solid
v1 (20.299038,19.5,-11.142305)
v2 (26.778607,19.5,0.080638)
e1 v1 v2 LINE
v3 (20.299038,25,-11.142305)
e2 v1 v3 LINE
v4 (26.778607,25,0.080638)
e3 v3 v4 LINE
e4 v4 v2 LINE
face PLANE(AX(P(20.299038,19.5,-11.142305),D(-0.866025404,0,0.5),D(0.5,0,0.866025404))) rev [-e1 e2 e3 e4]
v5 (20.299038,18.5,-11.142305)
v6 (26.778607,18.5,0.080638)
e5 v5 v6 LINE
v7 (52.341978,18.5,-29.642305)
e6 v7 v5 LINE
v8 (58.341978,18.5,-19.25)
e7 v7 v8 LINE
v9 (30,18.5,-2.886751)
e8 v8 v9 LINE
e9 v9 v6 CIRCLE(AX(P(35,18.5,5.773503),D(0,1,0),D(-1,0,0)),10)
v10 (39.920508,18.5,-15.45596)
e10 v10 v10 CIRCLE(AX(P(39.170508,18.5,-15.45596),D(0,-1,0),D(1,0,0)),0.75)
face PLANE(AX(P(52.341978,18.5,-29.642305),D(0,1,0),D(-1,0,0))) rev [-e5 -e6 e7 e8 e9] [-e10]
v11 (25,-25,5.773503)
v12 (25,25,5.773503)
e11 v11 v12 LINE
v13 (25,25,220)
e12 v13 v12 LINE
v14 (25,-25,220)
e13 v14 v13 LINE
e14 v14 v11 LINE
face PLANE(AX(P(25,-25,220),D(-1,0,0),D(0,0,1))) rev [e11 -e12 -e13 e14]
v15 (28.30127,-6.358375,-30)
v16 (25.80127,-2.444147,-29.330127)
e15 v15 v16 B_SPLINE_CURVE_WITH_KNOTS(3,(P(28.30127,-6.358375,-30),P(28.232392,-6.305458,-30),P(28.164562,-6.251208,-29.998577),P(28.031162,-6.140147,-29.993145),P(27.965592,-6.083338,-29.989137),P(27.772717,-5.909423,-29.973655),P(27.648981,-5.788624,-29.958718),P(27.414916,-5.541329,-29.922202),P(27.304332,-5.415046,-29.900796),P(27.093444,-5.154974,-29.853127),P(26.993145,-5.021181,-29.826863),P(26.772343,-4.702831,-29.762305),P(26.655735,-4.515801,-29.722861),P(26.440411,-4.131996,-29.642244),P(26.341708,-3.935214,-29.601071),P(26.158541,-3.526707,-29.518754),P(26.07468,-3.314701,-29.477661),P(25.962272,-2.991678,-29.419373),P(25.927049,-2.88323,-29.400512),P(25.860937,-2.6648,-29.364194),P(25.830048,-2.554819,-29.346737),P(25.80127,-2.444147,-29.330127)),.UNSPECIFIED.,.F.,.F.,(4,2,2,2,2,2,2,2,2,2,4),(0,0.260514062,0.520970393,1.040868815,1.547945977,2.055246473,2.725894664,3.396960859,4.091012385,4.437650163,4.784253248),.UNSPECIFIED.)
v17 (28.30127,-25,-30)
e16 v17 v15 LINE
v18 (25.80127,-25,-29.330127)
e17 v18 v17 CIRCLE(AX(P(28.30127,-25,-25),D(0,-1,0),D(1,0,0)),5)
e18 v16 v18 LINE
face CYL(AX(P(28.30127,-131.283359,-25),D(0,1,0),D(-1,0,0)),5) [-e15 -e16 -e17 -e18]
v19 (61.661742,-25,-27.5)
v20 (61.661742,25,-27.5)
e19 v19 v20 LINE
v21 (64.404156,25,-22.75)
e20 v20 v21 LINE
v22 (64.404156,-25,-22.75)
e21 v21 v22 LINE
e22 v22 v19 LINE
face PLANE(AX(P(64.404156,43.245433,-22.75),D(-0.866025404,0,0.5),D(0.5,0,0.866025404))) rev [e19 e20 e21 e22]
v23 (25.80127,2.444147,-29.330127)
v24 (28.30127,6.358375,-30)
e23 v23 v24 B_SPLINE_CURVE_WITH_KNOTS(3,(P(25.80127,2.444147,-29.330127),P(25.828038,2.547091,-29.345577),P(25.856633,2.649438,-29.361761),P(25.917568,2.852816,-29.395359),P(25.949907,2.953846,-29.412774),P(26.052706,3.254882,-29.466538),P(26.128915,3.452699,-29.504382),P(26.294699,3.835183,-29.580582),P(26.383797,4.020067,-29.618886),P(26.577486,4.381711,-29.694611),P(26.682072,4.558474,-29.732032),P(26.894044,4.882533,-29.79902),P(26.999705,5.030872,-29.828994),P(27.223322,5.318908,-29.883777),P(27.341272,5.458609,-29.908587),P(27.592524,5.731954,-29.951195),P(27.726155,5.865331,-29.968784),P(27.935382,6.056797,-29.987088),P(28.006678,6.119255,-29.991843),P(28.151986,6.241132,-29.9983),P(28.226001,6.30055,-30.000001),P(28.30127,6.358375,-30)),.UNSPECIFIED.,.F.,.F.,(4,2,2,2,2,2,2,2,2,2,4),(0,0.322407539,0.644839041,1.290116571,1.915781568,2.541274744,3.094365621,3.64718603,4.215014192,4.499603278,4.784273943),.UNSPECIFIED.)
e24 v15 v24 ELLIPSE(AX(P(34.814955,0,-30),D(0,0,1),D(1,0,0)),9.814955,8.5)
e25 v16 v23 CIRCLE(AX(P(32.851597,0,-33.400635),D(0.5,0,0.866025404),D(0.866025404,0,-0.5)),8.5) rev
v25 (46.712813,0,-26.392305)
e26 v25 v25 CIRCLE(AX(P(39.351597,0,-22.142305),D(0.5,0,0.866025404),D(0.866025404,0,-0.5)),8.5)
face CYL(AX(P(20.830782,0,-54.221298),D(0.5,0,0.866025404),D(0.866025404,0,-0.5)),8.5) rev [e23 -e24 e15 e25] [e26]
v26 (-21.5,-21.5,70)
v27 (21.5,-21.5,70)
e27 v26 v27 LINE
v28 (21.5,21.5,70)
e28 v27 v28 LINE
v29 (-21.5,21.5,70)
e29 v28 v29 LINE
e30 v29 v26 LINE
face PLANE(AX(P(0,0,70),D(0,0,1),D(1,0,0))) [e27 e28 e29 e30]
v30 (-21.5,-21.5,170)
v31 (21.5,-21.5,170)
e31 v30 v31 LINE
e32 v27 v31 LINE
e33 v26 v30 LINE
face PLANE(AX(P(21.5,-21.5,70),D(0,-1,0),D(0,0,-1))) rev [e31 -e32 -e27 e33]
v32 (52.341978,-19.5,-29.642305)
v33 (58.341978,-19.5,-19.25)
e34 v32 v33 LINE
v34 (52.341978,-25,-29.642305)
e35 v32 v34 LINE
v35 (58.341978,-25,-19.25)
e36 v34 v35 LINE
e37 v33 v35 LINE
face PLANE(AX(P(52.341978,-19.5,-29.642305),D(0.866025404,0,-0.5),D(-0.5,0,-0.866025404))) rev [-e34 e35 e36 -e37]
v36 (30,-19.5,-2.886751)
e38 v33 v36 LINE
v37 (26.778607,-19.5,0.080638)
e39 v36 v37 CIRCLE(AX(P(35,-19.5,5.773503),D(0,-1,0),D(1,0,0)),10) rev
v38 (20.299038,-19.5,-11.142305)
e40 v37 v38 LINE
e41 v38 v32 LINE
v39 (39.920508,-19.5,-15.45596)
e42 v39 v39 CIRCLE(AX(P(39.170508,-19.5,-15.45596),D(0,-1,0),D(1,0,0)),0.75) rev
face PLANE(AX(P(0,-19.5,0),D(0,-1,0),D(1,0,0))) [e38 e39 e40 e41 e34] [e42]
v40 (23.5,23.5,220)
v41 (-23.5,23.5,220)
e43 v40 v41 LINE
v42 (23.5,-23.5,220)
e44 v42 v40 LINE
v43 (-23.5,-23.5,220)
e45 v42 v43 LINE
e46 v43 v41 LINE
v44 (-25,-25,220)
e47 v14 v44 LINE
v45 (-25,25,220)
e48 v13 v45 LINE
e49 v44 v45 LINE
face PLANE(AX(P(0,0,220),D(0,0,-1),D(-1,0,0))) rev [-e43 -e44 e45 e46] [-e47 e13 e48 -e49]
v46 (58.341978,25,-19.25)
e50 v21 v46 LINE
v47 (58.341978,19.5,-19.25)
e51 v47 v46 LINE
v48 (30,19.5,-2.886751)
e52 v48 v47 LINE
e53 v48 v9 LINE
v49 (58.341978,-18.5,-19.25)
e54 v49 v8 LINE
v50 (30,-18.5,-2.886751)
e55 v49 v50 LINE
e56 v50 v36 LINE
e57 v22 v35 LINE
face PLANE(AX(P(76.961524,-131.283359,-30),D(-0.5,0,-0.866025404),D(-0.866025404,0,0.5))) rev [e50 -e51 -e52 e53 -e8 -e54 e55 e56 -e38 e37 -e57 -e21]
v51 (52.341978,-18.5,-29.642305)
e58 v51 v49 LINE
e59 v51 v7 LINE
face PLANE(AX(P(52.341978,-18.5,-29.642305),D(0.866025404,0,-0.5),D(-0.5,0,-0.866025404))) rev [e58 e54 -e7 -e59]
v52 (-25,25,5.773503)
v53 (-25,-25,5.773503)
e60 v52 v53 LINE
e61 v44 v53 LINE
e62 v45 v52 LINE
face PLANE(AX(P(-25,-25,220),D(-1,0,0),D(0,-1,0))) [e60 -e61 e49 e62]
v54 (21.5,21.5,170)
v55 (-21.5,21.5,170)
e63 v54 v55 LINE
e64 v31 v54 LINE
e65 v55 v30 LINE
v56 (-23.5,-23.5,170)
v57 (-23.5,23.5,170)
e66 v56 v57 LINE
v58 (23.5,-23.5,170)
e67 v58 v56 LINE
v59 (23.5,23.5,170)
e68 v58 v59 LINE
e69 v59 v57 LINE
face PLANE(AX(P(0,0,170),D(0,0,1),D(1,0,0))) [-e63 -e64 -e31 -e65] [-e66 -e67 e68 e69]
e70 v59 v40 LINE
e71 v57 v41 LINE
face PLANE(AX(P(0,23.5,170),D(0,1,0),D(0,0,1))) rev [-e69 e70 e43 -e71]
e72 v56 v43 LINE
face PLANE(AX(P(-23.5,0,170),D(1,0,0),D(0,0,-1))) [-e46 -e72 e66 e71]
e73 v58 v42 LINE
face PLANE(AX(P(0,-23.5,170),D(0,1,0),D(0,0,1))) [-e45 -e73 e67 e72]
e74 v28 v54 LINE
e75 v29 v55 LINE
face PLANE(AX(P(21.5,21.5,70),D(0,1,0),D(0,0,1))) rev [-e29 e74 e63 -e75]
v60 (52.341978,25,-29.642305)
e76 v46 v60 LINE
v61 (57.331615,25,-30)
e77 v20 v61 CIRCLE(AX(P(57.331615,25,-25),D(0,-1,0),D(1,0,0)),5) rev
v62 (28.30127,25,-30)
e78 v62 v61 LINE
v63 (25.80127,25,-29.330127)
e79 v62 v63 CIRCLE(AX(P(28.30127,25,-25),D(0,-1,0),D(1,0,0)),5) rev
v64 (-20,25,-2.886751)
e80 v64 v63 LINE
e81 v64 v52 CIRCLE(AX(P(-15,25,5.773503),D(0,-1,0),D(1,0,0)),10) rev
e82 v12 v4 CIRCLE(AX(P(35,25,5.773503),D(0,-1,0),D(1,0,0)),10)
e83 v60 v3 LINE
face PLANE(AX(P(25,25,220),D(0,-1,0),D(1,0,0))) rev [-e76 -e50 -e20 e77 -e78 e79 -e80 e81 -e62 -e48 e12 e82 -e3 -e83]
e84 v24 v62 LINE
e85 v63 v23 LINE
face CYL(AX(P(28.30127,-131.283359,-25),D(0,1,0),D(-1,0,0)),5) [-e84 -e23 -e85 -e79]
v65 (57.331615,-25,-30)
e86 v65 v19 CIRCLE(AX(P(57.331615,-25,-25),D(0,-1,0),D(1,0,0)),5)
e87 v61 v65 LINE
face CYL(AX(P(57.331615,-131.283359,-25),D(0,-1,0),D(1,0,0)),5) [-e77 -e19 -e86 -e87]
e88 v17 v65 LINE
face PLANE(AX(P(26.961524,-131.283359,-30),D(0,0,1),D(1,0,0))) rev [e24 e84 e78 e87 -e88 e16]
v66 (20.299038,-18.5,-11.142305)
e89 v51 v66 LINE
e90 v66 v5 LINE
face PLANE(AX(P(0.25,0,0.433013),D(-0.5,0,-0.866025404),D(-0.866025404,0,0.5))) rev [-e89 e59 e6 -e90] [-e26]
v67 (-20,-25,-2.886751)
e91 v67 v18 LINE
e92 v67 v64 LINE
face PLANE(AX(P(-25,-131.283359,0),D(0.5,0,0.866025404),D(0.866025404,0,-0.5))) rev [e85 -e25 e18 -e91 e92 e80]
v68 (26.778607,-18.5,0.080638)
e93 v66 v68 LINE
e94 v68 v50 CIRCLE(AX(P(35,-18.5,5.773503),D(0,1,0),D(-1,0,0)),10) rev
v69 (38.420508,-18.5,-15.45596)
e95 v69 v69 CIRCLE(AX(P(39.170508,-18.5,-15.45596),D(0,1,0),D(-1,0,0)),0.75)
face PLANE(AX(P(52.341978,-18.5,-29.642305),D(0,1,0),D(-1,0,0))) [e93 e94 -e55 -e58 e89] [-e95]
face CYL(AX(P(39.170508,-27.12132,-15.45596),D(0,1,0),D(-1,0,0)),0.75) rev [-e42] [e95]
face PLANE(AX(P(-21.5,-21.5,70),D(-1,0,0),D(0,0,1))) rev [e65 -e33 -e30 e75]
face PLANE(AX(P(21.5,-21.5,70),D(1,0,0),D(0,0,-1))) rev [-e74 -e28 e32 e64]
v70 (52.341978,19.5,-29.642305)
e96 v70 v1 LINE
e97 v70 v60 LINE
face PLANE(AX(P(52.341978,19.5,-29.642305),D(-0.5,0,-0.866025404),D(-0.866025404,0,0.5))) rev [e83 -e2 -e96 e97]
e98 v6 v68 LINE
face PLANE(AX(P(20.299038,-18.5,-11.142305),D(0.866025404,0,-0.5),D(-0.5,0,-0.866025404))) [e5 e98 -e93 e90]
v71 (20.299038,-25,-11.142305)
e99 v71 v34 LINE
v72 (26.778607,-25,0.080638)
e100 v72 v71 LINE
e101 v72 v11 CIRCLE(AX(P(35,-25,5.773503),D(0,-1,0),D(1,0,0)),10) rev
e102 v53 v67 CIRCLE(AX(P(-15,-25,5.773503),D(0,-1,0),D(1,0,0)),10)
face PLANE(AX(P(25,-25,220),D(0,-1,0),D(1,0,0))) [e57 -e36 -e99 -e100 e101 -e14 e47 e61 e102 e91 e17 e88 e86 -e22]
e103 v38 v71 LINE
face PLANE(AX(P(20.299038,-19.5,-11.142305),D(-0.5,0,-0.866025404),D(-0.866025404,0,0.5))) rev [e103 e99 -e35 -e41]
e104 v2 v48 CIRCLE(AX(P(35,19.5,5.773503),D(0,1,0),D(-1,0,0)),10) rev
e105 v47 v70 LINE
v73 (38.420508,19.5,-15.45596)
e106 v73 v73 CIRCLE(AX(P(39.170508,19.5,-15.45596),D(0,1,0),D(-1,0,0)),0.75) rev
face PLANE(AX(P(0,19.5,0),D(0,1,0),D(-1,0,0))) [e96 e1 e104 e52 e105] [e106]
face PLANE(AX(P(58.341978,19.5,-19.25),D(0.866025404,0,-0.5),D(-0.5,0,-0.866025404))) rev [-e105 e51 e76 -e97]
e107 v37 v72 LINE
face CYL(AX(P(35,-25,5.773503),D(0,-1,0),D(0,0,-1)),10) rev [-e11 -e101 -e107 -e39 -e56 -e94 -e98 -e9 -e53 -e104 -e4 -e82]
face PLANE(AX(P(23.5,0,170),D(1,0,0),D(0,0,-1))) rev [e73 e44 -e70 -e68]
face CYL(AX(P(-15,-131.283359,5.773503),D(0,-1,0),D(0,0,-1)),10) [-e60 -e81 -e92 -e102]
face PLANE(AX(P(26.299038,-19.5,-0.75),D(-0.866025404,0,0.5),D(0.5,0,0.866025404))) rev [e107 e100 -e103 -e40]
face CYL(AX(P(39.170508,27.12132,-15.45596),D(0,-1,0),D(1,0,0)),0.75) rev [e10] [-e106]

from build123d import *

# Parameters (mm, degrees)
SKETCH_1_W           = 50
SKETCH_1_H           = 50
EXTRUDE_1_DEPTH      = 220
EXTRUDE_2_DEPTH      = 50
SKETCH_4_W           = 37
SKETCH_4_H           = 37
CUT_EXTRUDE_2_DEPTH  = 12
CUT_EXTRUDE_3_REACH  = 235.922
SKETCH_5_R           = 8.5
SKETCH_8_R           = 0.75
CUT_EXTRUDE_4_DEPTH  = 6.5
CUT_EXTRUDE_START    = -6.5
SKETCH_7_R           = 0.75
CUT_EXTRUDE_5_DEPTH  = 6.5
CUT_EXTRUDE_6_DEPTH  = 5.5
CUT_EXTRUDE_7_DEPTH  = 5.5
CUT_EXTRUDE_8_DEPTH  = 50
FILLET_1_R           = 5
FILLET_2_R           = 5
FILLET_3_R           = 10
FILLET_4_R           = 10
SKETCH_13_W          = 47
SKETCH_13_H          = 47
CUT_EXTRUDE_9_DEPTH  = 50
SKETCH_2_W           = 43
SKETCH_2_H           = 43
CUT_EXTRUDE_10_DEPTH = 150
FILLET_5_R           = 5


with BuildPart() as part:
    # 草图1 → 凸台-拉伸1 (new body)
    with BuildSketch(Plane.XY):
        Rectangle(SKETCH_1_W, SKETCH_1_H)
    extrude(amount=EXTRUDE_1_DEPTH)

    # 草图3 → 凸台-拉伸2 (add)
    with BuildSketch(Plane(origin=(0, 25, 0), x_dir=(1, 0, 0), z_dir=(0, 1, 0))):
        Polygon((25, 0), (-25, 0), (26.961524227, 30), (76.961524227, 30), align=None)
    extrude(amount=-EXTRUDE_2_DEPTH)

    # 草图4 → 切除-拉伸2 (cut)
    with BuildSketch(Plane(origin=(6.25, 0, 10.825317547), x_dir=(0.8660254037844415, 0, -0.4999999999999951), z_dir=(0.4999999999999951, 0, 0.8660254037844415))):
        with Locations((41.650635095, 0)):
            Rectangle(SKETCH_4_W, SKETCH_4_H)
    extrude(amount=-CUT_EXTRUDE_2_DEPTH, mode=Mode.SUBTRACT)

    # 切除-拉伸3: up to this face of the body (flat: up to its plane)
    cut_extrude_3_end = Plane(part.part.faces().sort_by_distance((0.980762114, 0, -15))[0])
    # 草图5 → 切除-拉伸3 (cut, up to the picked face)
    with BuildSketch(Plane(origin=(0.25, 0, 0.433012702), x_dir=(0.8660254037844415, 0, -0.4999999999999951), z_dir=(0.4999999999999951, 0, 0.8660254037844415)), mode=Mode.PRIVATE) as cut_extrude_3_sk1:
        with Locations((45.150635095, 0)):
            Circle(SKETCH_5_R)
    cut_extrude_3_tool1 = split(extrude(cut_extrude_3_sk1.sketch, amount=-CUT_EXTRUDE_3_REACH, mode=Mode.PRIVATE), bisect_by=cut_extrude_3_end, keep=Keep.BOTH, mode=Mode.PRIVATE)
    add(cut_extrude_3_tool1.solids().sort_by(Axis((39.351597, 0, -22.142305), (-0.4999999999999951, 0, -0.8660254037844415)))[0], mode=Mode.SUBTRACT)

    # 草图8 → 切除-拉伸4 (cut)
    with BuildSketch(Plane.XZ.offset(-18.5)):
        with Locations((39.170508076, -15.455960044)):
            Circle(SKETCH_8_R)
    extrude(amount=-CUT_EXTRUDE_4_DEPTH, mode=Mode.SUBTRACT)

    # 草图7 → 切除-拉伸5 (cut)
    with BuildSketch(Plane(origin=(0, -18.5, 0), x_dir=(1, 0, 0), z_dir=(0, 1, 0)).offset(CUT_EXTRUDE_START)):
        with Locations((39.170508076, 15.455960044)):
            Circle(SKETCH_7_R)
    extrude(amount=CUT_EXTRUDE_5_DEPTH, mode=Mode.SUBTRACT)

    # 草图10 → 切除-拉伸6 (cut)
    with BuildSketch(Plane.XZ.offset(25)):
        Polygon((58.341978046, -19.25), (26.299038106, -0.75), (20.299038106, -11.142304845), (52.341978046, -29.642304845), align=None)
    extrude(amount=-CUT_EXTRUDE_6_DEPTH, mode=Mode.SUBTRACT)

    # 草图11 → 切除-拉伸7 (cut)
    with BuildSketch(Plane(origin=(0, 25, 0), x_dir=(1, 0, 0), z_dir=(0, 1, 0))):
        Polygon((26.299038106, 0.75), (58.341978046, 19.25), (52.341978046, 29.642304845), (20.299038106, 11.142304845), align=None)
    extrude(amount=-CUT_EXTRUDE_7_DEPTH, mode=Mode.SUBTRACT)

    # 草图12 → 切除-拉伸8 (cut)
    with BuildSketch(Plane.XZ.offset(25)):
        Polygon((64.404155872, -22.75), (60.218366421, -30), (76.961524227, -30), align=None)
    extrude(amount=-CUT_EXTRUDE_8_DEPTH, mode=Mode.SUBTRACT)

    # 圆角1
    fillet_1_edges = [part.edges().sort_by_distance(p)[0] for p in [
        (60.218366421, 0, -30),
    ]]
    fillet(fillet_1_edges, radius=FILLET_1_R)

    # 圆角2
    fillet_2_edges = [part.edges().sort_by_distance(p)[0] for p in [
        (26.961524227, -15.049152987, -30),
    ]]
    fillet(fillet_2_edges, radius=FILLET_2_R)

    # 圆角3
    fillet_3_edges = [part.edges().sort_by_distance(p)[0] for p in [
        (-25, 0, 0),
    ]]
    fillet(fillet_3_edges, radius=FILLET_3_R)

    # 圆角4
    # the kernel refuses this fillet: 10 mm, written as the material it adds along each edge
    with BuildSketch(Plane(origin=(25, 25, 0), x_dir=(0, 0, 1), z_dir=(0, -1, 0))) as fillet_4_piece_1_section:
        with BuildLine():
            CenterArc((FILLET_4_R * 0.57735026919, -FILLET_4_R), FILLET_4_R, 90, 60)
            Line((-FILLET_4_R * 0.288675134595, -FILLET_4_R * 0.5), (0, 0))
            Line((0, 0), (FILLET_4_R * 0.57735026919, 0))
        make_face()
    fillet_4_piece_1 = extrude(amount=50, mode=Mode.PRIVATE)
    fillet_4_piece_1 = split(fillet_4_piece_1, bisect_by=Plane(origin=(26.950281618, 22.25, 0.377986851), z_dir=(-0.8660254037844415, 0, 0.49999999999999517)), keep=Keep.TOP, mode=Mode.PRIVATE)
    add(fillet_4_piece_1)
    with BuildSketch(Plane(origin=(25, 39.43375673, 0), x_dir=(0, 0, 1), z_dir=(0, -1, 0))) as fillet_4_piece_2_section:
        with BuildLine():
            CenterArc((FILLET_4_R * 0.57735026919, -FILLET_4_R), FILLET_4_R, 90, 60)
            Line((-FILLET_4_R * 0.288675134595, -FILLET_4_R * 0.5), (0, 0))
            Line((0, 0), (FILLET_4_R * 0.57735026919, 0))
        make_face()
    fillet_4_piece_2 = extrude(amount=78.867513459, mode=Mode.PRIVATE)
    fillet_4_piece_2 = split(fillet_4_piece_2, bisect_by=Plane(origin=(27.357776316, 19.5, -1.0319296), z_dir=(0, -1, 0)), keep=Keep.TOP, mode=Mode.PRIVATE)
    fillet_4_piece_2 = split(fillet_4_piece_2, bisect_by=Plane(origin=(27.357776316, 18.5, -1.0319296), z_dir=(0, 1, 0)), keep=Keep.TOP, mode=Mode.PRIVATE)
    add(fillet_4_piece_2)
    with BuildSketch(Plane(origin=(25, 39.43375673, 0), x_dir=(0, 0, 1), z_dir=(0, -1, 0))) as fillet_4_piece_3_section:
        with BuildLine():
            CenterArc((FILLET_4_R * 0.57735026919, -FILLET_4_R), FILLET_4_R, 90, 60)
            Line((-FILLET_4_R * 0.288675134595, -FILLET_4_R * 0.5), (0, 0))
            Line((0, 0), (FILLET_4_R * 0.57735026919, 0))
        make_face()
    fillet_4_piece_3 = extrude(amount=78.867513459, mode=Mode.PRIVATE)
    fillet_4_piece_3 = split(fillet_4_piece_3, bisect_by=Plane(origin=(27.357776316, -19.5, -1.0319296), z_dir=(0, 1, 0)), keep=Keep.TOP, mode=Mode.PRIVATE)
    fillet_4_piece_3 = split(fillet_4_piece_3, bisect_by=Plane(origin=(27.357776316, -18.5, -1.0319296), z_dir=(0, -1, 0)), keep=Keep.TOP, mode=Mode.PRIVATE)
    add(fillet_4_piece_3)

    # 草图13 → 切除-拉伸9 (cut)
    with BuildSketch(Plane.XY.offset(220)):
        Rectangle(SKETCH_13_W, SKETCH_13_H)
    extrude(amount=-CUT_EXTRUDE_9_DEPTH, mode=Mode.SUBTRACT)

    # 草图2 → 切除-拉伸10 (cut)
    with BuildSketch(Plane.XY.offset(220)):
        Rectangle(SKETCH_2_W, SKETCH_2_H)
    extrude(amount=-CUT_EXTRUDE_10_DEPTH, mode=Mode.SUBTRACT)

    # 圆角5
    fillet_5_edges = [part.edges().sort_by_distance(p)[0] for p in [
        (26.961524227, 15.049152987, -30),
    ]]
    fillet(fillet_5_edges, radius=FILLET_5_R)


solid = part.part
